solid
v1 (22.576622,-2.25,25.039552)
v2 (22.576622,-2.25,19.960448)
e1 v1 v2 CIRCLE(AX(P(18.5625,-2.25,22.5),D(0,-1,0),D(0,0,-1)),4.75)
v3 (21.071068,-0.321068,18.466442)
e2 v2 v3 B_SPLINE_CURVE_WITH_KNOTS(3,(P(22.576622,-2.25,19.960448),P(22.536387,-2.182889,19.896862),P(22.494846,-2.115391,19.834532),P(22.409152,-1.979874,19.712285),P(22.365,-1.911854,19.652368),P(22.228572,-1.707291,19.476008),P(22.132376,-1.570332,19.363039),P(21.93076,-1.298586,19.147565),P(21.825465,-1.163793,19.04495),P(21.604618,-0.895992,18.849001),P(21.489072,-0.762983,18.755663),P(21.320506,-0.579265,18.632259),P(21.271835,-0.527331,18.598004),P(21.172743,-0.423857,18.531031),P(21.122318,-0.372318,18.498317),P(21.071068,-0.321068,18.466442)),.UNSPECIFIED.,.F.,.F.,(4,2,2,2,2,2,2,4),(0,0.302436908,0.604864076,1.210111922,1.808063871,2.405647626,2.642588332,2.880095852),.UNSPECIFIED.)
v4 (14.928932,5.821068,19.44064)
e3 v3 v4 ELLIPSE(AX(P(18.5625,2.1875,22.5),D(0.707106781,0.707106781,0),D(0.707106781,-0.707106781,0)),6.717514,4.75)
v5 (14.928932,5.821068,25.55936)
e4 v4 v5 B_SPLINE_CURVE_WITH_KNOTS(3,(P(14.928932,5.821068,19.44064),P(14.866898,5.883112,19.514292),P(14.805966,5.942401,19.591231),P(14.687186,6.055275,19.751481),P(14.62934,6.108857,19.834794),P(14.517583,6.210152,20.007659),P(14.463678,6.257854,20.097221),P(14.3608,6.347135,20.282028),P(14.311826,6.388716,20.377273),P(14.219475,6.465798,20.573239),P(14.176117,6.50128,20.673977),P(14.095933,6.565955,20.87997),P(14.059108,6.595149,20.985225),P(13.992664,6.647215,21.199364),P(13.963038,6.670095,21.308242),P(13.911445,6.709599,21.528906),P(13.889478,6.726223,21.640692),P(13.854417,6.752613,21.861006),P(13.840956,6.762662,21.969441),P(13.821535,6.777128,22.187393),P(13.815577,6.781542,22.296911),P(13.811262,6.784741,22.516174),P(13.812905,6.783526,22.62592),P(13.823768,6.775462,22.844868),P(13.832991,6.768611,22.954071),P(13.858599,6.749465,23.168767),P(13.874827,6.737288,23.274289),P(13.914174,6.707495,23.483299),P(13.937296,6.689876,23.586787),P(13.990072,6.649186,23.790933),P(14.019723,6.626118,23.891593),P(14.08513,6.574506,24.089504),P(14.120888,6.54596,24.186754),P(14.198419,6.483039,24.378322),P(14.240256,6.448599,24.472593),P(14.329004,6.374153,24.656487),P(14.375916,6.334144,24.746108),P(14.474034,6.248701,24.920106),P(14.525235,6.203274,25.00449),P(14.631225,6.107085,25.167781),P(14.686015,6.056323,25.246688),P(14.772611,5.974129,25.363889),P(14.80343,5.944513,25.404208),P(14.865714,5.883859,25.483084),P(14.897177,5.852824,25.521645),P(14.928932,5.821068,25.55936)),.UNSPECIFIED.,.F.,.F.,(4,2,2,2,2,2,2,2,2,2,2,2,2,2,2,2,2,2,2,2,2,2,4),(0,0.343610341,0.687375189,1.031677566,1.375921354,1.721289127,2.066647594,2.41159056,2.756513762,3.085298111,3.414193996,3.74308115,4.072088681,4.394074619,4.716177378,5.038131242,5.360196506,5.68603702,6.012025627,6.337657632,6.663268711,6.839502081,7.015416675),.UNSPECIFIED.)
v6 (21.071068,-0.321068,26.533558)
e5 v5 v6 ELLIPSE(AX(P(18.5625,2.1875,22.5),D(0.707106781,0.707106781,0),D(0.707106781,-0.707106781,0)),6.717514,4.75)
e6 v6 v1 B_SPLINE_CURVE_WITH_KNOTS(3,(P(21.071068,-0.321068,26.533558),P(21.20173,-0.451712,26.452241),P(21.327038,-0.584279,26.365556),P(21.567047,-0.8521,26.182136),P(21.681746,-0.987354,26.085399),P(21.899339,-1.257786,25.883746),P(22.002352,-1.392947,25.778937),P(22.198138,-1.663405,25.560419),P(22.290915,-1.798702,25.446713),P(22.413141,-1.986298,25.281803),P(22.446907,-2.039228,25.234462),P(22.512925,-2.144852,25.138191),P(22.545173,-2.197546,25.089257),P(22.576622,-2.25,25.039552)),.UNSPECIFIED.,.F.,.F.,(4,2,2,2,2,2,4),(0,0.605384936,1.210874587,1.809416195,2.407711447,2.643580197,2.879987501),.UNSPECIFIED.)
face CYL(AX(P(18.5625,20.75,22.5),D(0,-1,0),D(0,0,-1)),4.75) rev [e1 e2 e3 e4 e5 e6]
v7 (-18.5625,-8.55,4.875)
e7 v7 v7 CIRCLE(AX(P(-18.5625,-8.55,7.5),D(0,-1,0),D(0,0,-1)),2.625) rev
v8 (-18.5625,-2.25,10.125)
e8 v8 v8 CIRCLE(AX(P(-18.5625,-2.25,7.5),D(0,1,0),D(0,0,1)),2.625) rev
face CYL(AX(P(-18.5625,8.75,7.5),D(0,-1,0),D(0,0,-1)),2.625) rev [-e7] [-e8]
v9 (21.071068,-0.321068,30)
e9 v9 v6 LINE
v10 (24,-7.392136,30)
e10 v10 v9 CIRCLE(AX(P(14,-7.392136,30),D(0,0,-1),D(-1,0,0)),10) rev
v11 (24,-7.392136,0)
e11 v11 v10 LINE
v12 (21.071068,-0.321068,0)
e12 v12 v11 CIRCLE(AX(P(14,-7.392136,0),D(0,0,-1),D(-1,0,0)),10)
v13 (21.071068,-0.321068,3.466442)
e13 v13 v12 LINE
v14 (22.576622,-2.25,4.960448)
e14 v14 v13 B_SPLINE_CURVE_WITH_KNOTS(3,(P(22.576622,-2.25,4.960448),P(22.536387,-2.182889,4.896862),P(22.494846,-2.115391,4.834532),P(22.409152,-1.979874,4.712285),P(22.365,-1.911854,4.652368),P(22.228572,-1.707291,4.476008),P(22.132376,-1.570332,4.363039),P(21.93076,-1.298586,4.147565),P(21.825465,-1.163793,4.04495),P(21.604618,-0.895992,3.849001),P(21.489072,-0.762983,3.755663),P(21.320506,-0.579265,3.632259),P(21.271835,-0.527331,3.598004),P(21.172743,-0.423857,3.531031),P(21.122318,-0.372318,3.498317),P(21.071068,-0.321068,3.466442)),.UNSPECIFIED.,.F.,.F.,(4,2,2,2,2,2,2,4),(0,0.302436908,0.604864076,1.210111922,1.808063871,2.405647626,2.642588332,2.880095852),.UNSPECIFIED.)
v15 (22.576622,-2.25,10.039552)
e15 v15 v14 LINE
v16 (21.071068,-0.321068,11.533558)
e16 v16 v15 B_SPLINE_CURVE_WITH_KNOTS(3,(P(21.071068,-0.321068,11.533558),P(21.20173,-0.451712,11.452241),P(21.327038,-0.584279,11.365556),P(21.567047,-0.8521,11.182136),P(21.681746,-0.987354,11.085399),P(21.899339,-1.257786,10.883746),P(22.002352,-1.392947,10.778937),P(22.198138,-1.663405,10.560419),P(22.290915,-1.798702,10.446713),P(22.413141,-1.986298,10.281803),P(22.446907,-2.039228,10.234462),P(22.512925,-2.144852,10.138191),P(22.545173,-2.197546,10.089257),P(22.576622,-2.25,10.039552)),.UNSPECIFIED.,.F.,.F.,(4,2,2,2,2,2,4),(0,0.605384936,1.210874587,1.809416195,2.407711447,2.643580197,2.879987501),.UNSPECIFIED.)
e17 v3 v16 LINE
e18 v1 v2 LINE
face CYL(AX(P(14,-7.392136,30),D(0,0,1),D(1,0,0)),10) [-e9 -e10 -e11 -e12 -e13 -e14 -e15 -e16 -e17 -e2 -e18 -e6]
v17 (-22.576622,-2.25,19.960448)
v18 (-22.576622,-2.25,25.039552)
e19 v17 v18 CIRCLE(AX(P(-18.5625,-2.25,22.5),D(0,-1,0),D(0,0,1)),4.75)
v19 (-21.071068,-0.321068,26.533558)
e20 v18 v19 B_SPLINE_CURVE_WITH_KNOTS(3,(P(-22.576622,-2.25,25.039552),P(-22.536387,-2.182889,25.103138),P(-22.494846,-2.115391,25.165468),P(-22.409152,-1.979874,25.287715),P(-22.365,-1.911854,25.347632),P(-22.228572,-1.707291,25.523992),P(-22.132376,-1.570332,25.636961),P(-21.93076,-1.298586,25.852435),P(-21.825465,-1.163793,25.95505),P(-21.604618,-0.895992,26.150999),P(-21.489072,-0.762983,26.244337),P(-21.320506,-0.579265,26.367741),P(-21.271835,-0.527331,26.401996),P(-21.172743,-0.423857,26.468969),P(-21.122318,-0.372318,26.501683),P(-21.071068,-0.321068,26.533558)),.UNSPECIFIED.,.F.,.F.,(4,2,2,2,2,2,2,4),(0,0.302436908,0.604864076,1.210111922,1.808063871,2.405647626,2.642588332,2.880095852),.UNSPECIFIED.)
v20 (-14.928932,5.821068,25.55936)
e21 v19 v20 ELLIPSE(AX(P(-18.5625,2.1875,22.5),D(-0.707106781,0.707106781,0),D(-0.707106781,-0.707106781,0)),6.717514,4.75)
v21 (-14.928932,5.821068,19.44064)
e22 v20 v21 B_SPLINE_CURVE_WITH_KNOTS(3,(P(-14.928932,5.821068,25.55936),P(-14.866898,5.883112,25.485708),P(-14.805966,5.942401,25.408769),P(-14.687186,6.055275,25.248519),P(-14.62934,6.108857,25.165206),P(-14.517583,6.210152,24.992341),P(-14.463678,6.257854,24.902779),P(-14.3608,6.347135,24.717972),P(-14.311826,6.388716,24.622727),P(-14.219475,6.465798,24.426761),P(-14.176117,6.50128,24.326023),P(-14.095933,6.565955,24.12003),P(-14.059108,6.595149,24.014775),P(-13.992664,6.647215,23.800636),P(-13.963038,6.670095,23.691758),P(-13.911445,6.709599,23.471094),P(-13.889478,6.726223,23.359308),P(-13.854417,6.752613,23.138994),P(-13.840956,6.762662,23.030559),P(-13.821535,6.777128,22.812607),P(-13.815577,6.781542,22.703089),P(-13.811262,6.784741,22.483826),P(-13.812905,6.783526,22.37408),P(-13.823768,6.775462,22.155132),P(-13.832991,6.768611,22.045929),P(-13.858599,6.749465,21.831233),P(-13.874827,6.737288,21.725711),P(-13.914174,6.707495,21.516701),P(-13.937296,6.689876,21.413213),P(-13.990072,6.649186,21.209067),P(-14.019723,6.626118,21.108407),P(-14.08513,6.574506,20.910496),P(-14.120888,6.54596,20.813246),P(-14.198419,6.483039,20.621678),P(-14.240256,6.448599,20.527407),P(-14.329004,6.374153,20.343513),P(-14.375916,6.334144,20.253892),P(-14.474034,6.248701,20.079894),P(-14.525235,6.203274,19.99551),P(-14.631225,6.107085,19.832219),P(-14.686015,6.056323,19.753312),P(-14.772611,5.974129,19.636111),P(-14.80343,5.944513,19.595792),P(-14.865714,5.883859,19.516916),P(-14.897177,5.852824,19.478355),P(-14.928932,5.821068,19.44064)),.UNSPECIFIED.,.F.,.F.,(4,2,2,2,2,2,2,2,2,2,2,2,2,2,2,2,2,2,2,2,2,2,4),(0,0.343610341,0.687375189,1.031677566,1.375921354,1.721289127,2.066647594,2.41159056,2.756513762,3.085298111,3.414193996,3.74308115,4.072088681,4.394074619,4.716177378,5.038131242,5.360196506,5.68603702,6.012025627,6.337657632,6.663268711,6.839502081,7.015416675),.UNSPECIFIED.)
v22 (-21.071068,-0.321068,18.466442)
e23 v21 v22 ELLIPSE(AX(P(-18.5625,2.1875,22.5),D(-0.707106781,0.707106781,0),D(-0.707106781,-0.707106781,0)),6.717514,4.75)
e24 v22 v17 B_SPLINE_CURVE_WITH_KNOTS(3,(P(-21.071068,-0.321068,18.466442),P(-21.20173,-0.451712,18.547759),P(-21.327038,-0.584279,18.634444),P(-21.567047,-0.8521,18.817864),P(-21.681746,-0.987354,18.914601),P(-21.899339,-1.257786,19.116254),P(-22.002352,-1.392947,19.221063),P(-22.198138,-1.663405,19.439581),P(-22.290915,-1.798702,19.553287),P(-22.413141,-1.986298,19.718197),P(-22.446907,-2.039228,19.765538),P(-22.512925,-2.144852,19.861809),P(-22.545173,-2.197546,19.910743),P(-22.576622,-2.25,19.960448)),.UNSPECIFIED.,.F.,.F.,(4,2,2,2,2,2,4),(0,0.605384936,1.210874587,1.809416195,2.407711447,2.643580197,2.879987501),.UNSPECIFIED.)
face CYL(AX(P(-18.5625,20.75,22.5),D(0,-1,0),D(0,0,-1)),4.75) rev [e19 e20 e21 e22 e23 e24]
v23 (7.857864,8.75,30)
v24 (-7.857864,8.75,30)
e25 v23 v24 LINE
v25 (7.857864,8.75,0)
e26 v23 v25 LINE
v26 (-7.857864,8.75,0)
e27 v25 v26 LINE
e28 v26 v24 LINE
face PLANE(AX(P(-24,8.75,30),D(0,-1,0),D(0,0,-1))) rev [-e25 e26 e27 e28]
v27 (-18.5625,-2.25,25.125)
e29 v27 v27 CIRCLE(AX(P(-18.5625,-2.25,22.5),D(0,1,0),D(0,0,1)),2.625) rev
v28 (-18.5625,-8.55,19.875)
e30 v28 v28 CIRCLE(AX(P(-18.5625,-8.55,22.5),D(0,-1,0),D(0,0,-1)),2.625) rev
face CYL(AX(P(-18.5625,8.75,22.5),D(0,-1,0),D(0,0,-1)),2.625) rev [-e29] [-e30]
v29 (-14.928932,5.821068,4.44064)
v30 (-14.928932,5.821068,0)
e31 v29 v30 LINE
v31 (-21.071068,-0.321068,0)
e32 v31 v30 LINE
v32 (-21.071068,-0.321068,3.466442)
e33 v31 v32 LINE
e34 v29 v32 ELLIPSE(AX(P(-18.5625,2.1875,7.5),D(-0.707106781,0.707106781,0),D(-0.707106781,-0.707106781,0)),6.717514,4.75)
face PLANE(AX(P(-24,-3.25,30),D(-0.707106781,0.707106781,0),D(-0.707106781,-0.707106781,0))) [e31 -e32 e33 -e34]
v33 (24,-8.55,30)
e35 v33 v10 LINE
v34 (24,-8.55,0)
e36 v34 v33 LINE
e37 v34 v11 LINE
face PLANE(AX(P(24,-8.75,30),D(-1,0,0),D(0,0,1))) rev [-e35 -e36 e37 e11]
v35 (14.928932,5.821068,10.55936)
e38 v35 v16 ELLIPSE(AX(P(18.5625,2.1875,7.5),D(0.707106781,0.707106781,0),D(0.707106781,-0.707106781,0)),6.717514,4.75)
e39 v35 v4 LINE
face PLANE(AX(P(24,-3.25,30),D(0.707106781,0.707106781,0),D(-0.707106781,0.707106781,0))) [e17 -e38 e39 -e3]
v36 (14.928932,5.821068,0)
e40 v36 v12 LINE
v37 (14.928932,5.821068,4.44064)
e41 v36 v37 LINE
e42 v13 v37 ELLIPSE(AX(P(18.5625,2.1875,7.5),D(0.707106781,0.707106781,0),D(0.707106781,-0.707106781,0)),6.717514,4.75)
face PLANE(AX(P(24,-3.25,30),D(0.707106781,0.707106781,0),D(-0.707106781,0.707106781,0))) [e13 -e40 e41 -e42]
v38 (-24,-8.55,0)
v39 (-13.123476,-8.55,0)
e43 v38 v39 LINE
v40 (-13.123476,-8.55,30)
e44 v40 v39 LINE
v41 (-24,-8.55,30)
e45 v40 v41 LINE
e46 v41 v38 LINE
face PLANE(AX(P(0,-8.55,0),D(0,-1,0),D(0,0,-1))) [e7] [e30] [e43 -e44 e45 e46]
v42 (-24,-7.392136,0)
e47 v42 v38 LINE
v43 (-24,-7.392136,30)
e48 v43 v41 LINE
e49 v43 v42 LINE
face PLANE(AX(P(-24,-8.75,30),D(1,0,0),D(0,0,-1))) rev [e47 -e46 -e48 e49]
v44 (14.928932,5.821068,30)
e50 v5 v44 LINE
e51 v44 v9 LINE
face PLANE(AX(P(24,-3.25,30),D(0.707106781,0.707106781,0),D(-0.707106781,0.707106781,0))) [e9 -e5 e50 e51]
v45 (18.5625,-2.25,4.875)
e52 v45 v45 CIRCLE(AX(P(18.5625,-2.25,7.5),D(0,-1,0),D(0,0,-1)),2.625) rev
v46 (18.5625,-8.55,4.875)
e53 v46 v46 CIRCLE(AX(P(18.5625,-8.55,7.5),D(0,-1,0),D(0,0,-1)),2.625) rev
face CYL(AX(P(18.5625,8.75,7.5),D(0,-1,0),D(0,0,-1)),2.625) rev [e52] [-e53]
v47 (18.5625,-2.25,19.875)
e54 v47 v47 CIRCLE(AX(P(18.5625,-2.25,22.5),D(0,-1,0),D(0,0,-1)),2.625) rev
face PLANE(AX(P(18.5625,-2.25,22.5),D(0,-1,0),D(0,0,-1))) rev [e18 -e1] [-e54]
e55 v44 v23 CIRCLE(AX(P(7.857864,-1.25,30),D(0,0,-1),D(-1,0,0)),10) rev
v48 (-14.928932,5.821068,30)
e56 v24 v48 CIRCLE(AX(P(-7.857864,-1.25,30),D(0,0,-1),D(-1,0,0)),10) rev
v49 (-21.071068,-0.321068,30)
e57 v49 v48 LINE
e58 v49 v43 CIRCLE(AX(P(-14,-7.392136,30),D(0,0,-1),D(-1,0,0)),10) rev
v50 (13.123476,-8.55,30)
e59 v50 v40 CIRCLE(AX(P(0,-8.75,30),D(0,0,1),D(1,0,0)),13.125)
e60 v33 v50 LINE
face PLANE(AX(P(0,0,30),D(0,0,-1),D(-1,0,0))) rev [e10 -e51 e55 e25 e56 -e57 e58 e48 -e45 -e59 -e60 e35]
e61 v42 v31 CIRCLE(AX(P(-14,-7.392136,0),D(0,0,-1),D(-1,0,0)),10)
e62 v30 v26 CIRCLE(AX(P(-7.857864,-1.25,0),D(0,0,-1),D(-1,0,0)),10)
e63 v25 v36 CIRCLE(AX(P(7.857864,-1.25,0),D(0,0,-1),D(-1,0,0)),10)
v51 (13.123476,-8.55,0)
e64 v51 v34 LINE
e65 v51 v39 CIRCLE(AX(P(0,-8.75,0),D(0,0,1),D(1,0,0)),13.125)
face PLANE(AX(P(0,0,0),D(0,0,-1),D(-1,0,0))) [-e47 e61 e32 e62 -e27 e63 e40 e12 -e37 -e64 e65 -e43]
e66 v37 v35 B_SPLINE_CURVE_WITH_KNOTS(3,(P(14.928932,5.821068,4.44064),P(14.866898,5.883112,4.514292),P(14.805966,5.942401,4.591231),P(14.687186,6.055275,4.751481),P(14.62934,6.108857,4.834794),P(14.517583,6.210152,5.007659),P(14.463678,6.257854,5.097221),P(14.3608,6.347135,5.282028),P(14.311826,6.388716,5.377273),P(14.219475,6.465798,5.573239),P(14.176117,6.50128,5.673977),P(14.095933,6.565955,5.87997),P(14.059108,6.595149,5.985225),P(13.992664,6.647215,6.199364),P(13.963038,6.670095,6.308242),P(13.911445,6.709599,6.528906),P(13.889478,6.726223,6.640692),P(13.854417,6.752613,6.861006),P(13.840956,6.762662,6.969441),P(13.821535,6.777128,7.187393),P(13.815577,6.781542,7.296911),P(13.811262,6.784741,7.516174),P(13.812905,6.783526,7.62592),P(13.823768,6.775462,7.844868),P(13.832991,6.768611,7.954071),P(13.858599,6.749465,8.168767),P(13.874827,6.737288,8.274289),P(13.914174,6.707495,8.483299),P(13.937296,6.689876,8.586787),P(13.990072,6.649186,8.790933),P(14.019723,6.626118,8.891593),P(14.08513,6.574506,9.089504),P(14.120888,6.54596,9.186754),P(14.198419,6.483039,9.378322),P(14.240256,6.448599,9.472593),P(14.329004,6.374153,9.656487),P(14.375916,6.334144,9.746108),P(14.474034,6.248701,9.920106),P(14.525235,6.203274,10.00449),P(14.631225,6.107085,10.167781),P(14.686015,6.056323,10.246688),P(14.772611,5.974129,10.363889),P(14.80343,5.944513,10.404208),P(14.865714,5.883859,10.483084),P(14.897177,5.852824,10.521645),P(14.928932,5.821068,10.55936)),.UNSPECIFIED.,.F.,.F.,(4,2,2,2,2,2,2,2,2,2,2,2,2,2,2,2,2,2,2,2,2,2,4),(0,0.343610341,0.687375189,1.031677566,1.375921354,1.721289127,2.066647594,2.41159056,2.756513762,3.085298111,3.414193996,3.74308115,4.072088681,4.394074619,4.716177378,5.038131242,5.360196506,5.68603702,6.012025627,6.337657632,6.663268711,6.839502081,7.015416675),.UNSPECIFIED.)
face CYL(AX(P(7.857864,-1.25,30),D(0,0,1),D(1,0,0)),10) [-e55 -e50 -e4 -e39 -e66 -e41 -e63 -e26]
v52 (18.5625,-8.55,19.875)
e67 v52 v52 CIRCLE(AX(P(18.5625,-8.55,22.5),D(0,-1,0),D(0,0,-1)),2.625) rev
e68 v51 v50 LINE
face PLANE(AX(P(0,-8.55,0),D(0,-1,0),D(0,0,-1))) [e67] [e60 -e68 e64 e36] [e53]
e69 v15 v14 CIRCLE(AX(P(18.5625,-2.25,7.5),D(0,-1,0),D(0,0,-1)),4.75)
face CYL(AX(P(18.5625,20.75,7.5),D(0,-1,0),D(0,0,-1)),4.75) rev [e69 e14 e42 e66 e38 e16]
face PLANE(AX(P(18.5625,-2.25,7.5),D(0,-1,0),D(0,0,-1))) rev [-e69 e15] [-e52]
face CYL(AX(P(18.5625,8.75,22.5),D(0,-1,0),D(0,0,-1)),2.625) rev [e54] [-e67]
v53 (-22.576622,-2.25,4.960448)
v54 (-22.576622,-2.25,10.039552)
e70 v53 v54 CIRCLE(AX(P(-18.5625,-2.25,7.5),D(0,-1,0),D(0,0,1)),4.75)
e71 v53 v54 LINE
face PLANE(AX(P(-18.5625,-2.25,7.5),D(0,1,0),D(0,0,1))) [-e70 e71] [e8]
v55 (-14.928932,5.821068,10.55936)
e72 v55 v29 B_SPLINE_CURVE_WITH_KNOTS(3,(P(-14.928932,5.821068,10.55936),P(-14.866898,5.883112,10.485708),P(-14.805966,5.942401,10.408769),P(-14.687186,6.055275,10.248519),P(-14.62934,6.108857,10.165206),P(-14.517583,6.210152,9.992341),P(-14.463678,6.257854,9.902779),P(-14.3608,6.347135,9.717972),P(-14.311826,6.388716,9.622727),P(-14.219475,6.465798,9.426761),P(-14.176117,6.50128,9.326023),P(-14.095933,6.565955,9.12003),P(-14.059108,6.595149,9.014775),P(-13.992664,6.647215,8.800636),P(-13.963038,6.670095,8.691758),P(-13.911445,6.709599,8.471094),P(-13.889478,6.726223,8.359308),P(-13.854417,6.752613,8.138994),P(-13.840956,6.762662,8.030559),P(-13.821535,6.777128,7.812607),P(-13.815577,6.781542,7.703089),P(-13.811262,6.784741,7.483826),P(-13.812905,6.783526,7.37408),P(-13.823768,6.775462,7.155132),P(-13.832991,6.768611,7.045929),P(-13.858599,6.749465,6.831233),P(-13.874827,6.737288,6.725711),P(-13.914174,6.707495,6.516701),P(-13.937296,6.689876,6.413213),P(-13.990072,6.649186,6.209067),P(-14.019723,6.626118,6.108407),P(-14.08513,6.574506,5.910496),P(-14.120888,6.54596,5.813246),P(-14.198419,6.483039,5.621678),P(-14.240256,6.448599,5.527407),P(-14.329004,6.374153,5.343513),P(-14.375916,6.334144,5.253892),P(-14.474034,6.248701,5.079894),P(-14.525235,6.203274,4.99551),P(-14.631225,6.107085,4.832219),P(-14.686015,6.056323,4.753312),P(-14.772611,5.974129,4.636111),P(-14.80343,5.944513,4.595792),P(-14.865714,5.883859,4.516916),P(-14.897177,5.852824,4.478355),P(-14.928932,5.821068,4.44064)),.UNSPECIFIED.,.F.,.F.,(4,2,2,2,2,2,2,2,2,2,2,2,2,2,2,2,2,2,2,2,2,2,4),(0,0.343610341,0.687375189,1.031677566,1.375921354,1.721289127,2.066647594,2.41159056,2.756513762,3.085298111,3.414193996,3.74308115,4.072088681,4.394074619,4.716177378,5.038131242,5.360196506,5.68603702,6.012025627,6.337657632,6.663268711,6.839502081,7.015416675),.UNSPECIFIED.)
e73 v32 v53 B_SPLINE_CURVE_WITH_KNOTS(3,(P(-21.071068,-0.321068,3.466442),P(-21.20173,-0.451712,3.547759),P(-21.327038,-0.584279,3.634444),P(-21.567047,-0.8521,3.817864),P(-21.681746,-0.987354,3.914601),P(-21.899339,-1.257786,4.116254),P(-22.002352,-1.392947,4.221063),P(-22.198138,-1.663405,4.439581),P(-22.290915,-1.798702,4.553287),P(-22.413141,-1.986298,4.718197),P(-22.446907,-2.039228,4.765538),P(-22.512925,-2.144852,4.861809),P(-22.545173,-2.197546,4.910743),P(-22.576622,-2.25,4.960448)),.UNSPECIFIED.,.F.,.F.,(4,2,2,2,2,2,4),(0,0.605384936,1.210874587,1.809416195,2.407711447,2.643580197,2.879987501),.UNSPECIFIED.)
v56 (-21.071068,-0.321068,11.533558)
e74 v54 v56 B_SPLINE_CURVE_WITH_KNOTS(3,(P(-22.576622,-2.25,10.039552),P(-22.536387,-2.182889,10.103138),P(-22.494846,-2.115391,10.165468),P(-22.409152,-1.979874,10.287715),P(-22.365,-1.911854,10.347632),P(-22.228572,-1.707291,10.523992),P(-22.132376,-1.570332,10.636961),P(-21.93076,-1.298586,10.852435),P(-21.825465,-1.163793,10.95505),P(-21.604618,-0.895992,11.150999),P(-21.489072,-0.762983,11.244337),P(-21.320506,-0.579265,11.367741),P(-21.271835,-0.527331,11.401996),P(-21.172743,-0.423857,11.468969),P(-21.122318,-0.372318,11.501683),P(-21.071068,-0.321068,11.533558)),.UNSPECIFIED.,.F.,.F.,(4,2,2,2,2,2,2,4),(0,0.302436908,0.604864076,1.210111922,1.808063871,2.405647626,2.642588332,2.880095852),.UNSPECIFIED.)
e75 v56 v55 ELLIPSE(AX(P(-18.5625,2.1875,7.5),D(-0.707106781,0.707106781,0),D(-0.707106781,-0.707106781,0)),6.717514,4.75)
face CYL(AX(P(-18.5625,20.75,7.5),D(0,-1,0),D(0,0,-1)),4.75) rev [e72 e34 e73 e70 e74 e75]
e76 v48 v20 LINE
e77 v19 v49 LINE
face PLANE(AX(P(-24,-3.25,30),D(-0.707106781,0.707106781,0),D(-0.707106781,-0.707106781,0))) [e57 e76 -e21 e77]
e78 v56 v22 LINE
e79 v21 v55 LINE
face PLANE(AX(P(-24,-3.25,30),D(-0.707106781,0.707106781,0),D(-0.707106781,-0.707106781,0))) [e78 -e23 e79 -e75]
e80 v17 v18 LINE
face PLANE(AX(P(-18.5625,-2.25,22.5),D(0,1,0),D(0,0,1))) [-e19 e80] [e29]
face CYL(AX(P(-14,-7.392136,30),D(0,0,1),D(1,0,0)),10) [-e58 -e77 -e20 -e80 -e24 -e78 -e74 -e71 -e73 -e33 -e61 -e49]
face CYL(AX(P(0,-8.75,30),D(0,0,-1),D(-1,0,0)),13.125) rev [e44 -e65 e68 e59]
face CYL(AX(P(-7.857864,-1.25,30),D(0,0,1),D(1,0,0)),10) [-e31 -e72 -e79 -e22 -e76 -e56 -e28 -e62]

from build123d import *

# Parameters (mm, degrees)
SKETCH1_W              = 48
SKETCH1_H              = 17.5
BODY_DEPTH             = 30
TUBE_CUTOUT_DEPTH      = 40.402569713
SKETCH3_R              = 2.625
CUT_EXTRUDE_M5_DEPTH   = 43.216702856
SLOPE_DEPTH            = 40.402569713
BOLT_HEAD_CUTOUT_START = -6.5
SKETCH5_R              = 4.75
BOLT_HEAD_CUTOUT_DEPTH = 23
FILLET_2_R             = 10
SKETCH7_W              = 48
SKETCH7_H              = 30
CLEARANCE_DEPTH        = 0.2


with BuildPart() as part:
    # Sketch1 → body (new body)
    with BuildSketch(Plane.XY):
        Rectangle(SKETCH1_W, SKETCH1_H)
    extrude(amount=BODY_DEPTH)

    # Sketch2 → tube_cutout (cut, through all)
    with BuildSketch(Plane.XY):
        with BuildLine():
            Line((13.125, -8.75), (-13.125, -8.75))
            ThreePointArc((-13.125, -8.75), (0, 4.375), (13.125, -8.75))
        make_face()
    extrude(amount=TUBE_CUTOUT_DEPTH, mode=Mode.SUBTRACT)

    # Sketch3 → Cut-Extrude M5 (cut, through all)
    with BuildSketch(Plane.XZ.offset(8.75)):
        with Locations(Location((18.5625, 22.5, 0), (0, 0, 270))):
            Circle(SKETCH3_R)
        with Locations(Location((18.5625, 7.5, 0), (0, 0, 270))):
            Circle(SKETCH3_R)
        with Locations(Location((-18.5625, 7.5, 0), (0, 0, 90))):
            Circle(SKETCH3_R)
        with Locations(Location((-18.5625, 22.5, 0), (0, 0, 90))):
            Circle(SKETCH3_R)
    extrude(amount=-CUT_EXTRUDE_M5_DEPTH, mode=Mode.SUBTRACT)

    # Sketch4 → slope (cut, through all)
    with BuildSketch(Plane.XY):
        Polygon((-24, 8.75), (-24, -3.25), (-12, 8.75), align=None)
        Polygon((24, -3.25), (12, 8.75), (24, 8.75), align=None)
    extrude(amount=SLOPE_DEPTH, mode=Mode.SUBTRACT)

    # Sketch5 → bolt_head_cutout (cut)
    with BuildSketch(Plane.XZ.offset(8.75).offset(BOLT_HEAD_CUTOUT_START)):
        with Locations((18.5625, 22.5)):
            Circle(SKETCH5_R)
        with Locations((18.5625, 7.5)):
            Circle(SKETCH5_R)
        with Locations((-18.5625, 7.5)):
            Circle(SKETCH5_R)
        with Locations((-18.5625, 22.5)):
            Circle(SKETCH5_R)
    extrude(amount=-BOLT_HEAD_CUTOUT_DEPTH, mode=Mode.SUBTRACT)

    # fillet 2
    # the kernel refuses this fillet: 10 mm, written as the material it takes off along each edge
    with BuildSketch(Plane(origin=(24, -3.25, -10.355339059), x_dir=(-0.7071067811865475, 0.7071067811865478, 0), z_dir=(0, 0, 1)), Plane(origin=(12, 8.75, -10.355339059), x_dir=(-1, 0, 0), z_dir=(0, 0, 1)), Plane(origin=(-12, 8.75, -10.355339059), x_dir=(-0.7071067811865474, -0.7071067811865478, 0), z_dir=(0, 0, 1))) as fillet_2_piece_1:
        with BuildLine():
            CenterArc((FILLET_2_R * 0.414213562373, FILLET_2_R), FILLET_2_R, 225, 45)
            Line((-FILLET_2_R * 0.292893218813, FILLET_2_R * 0.292893218813), (0, 0))
            Line((0, 0), (FILLET_2_R * 0.414213562373, 0))
        make_face()
    extrude(amount=50.710678119, mode=Mode.SUBTRACT)
    with BuildSketch(Plane(origin=(-24, -3.25, -10.355339059), x_dir=(0.7071067811865469, 0.707106781186548, 0), z_dir=(0, 0, 1))) as fillet_2_piece_2:
        with BuildLine():
            CenterArc((FILLET_2_R * 0.414213562373, -FILLET_2_R), FILLET_2_R, 90, 45)
            Line((-FILLET_2_R * 0.292893218813, -FILLET_2_R * 0.292893218813), (0, 0))
            Line((0, 0), (FILLET_2_R * 0.414213562373, 0))
        make_face()
    extrude(amount=50.710678119, mode=Mode.SUBTRACT)

    # Sketch7 → clearance (cut)
    with BuildSketch(Plane.XZ.offset(8.75)):
        with Locations((0, 15)):
            Rectangle(SKETCH7_W, SKETCH7_H)
    extrude(amount=-CLEARANCE_DEPTH, mode=Mode.SUBTRACT)


solid = part.part
